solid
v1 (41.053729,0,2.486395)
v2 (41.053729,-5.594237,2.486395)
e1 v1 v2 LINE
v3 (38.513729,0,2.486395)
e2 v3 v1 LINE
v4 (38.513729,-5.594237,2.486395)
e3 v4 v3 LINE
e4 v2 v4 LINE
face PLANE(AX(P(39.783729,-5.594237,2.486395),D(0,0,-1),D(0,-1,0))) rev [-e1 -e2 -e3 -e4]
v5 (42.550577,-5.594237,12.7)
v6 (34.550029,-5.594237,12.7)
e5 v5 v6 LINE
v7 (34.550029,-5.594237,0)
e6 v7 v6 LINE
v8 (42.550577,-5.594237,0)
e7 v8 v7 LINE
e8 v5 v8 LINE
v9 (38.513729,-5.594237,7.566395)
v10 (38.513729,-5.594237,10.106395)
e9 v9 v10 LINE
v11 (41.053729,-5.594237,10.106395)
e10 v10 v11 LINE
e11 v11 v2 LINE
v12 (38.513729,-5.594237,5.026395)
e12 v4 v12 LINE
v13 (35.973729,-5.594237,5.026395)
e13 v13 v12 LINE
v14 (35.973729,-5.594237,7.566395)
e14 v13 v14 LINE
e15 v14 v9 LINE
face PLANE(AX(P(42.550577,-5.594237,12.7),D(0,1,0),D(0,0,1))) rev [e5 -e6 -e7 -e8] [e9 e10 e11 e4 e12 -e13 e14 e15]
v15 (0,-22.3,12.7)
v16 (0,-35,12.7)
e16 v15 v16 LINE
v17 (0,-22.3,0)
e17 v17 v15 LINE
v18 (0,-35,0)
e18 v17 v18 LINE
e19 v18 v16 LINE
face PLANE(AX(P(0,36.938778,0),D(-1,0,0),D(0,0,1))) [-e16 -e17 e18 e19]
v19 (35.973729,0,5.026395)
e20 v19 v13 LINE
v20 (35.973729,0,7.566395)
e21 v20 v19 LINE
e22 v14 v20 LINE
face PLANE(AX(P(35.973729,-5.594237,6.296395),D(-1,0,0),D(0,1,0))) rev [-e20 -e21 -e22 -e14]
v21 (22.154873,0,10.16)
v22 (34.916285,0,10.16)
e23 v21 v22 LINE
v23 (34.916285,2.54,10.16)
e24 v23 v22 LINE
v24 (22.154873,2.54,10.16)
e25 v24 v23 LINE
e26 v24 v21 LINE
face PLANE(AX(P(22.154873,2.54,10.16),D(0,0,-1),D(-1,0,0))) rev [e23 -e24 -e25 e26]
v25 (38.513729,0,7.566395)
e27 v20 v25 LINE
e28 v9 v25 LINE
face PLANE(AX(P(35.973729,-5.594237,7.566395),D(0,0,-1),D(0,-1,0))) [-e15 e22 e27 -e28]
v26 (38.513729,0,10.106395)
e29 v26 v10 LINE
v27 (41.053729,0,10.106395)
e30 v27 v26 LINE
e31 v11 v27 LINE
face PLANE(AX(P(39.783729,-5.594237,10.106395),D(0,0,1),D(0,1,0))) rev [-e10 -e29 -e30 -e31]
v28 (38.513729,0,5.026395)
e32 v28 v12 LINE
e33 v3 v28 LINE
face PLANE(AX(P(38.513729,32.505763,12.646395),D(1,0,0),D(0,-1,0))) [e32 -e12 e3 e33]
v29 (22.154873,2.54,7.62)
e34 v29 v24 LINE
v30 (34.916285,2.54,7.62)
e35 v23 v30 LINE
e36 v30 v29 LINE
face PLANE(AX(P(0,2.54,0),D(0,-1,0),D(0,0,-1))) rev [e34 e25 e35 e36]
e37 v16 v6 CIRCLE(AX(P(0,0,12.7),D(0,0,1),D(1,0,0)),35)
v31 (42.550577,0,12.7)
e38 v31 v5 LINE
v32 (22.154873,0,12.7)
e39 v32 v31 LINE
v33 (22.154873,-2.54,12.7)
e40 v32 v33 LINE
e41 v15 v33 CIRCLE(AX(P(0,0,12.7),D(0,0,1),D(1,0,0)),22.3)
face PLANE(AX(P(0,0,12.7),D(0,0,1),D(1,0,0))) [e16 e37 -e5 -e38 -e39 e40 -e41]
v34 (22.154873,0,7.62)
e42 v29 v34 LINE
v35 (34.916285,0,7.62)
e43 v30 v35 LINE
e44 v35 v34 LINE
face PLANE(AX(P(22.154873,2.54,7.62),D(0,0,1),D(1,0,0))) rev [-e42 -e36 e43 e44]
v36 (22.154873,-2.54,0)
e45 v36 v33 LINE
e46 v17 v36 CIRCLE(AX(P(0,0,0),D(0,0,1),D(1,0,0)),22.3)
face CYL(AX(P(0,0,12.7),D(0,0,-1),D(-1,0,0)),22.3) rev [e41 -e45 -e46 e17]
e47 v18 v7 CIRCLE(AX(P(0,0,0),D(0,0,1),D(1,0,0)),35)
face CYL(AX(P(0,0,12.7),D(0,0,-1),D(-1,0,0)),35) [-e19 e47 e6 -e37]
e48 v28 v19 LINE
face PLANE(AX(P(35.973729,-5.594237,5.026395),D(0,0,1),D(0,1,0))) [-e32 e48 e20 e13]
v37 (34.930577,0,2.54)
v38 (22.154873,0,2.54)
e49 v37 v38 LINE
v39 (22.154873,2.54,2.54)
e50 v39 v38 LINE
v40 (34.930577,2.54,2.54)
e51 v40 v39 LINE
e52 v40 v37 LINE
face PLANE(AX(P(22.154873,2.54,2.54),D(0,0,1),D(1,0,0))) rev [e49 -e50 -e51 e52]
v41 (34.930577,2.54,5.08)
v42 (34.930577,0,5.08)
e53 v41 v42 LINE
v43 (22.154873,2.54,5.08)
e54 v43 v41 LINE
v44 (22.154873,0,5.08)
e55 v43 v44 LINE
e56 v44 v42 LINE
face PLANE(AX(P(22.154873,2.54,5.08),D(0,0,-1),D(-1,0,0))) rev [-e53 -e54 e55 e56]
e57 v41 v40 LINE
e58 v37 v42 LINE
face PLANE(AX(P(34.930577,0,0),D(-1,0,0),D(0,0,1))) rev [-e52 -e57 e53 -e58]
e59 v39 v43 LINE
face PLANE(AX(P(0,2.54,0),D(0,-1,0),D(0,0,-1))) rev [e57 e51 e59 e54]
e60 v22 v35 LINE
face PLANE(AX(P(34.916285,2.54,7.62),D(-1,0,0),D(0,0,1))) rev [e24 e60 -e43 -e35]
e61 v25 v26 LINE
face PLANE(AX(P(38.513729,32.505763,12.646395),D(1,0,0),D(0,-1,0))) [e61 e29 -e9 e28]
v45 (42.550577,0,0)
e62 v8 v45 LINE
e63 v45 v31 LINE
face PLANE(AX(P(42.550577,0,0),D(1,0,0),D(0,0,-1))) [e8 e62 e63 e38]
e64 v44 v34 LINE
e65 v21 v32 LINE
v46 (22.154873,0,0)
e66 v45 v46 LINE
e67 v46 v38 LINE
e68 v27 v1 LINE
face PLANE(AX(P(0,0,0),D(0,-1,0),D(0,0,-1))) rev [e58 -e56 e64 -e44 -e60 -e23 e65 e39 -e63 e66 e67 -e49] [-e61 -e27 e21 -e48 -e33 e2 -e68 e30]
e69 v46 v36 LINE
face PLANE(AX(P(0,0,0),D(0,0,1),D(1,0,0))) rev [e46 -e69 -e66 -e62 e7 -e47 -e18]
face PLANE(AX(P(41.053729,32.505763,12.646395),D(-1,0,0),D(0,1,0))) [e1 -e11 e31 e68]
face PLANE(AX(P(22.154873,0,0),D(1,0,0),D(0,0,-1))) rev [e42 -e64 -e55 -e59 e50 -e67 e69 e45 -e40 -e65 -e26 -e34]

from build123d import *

# Parameters (mm, degrees)
SKETCH1_R               = 35
SKETCH1_R_2             = 22.3
BOSS_EXTRUDE2_DEPTH     = 12.7
SKETCH4_W               = 2.54
SKETCH4_H               = 76.791301982
SKETCH4_W_2             = 87.412375573
SKETCH4_H_2             = 2.54
CUT_EXTRUDE_THIN4_DEPTH = 12.7
SKETCH7_W               = 12.775704106
SKETCH7_H               = 12.7
BOSS_EXTRUDE3_DEPTH     = 2.54
SKETCH11_W              = 12.775704106
SKETCH11_H              = 2.54
SKETCH11_W_2            = 12.761411891
BOSS_EXTRUDE6_DEPTH     = 2.54
SKETCH12_W              = 12.7
SKETCH12_H              = 5.594236833
BOSS_EXTRUDE7_DEPTH     = 7.62
SKETCH12_2_W            = 12.7
SKETCH12_2_H            = 5.594236833
BOSS_EXTRUDE8_DEPTH     = 2.54
CAVITY3_START           = 38.513729061
CAVITY3_OUTLINE_W       = 5.594236833
CAVITY3_OUTLINE_H       = 7.62
CAVITY3_DEPTH           = 2.54
CAVITY3_START_2         = 35.973729061
CAVITY3_2_OUTLINE_W     = 5.594236833
CAVITY3_2_OUTLINE_H     = 2.54
CAVITY3_2_DEPTH         = 2.54


# Read off the part's stored shape, not the designer's step: Cavity3
with BuildPart() as part:
    # Sketch1 → Boss-Extrude2 (new body)
    with BuildSketch(Plane.XY):
        Circle(SKETCH1_R)
        Circle(SKETCH1_R_2, mode=Mode.SUBTRACT)
    extrude(amount=BOSS_EXTRUDE2_DEPTH)

    # Sketch4 → Cut-Extrude-Thin4 (cut)
    with BuildSketch(Plane.XY.offset(12.7)):
        with Locations((-1.27, -1.456872926)):
            Rectangle(SKETCH4_W, SKETCH4_H)
        with Locations((4.088643373, -1.27)):
            Rectangle(SKETCH4_W_2, SKETCH4_H_2)
    extrude(amount=-CUT_EXTRUDE_THIN4_DEPTH, mode=Mode.SUBTRACT)


with BuildPart() as body_2:
    # of the pieces the cut leaves, the one that is kept (cut_extrude_thin4_keep)
    add(part.part.solids().sort_by_distance((34.907712615, -2.54, 12.7))[0])

    # Sketch7 → Boss-Extrude3 (add)
    with BuildSketch(Plane(origin=(0, -2.54, 0), x_dir=(1, 0, 0), z_dir=(0, 1, 0))):
        with Locations((28.542725106, -6.35)):
            Rectangle(SKETCH7_W, SKETCH7_H)
    extrude(amount=BOSS_EXTRUDE3_DEPTH)

    # Sketch11 → Boss-Extrude6 (add)
    with BuildSketch(Plane(origin=(0, 0, 0), x_dir=(1, 0, 0), z_dir=(0, 1, 0))):
        with Locations((28.542725106, -3.81)):
            Rectangle(SKETCH11_W, SKETCH11_H)
        with Locations((28.535578999, -8.89)):
            Rectangle(SKETCH11_W_2, SKETCH11_H)
    extrude(amount=BOSS_EXTRUDE6_DEPTH)

    # Sketch12 → Boss-Extrude7 (add)
    with BuildSketch(Plane(origin=(34.930577159, 0, 0), x_dir=(0, 0, -1), z_dir=(1, 0, 0))):
        with Locations((-6.35, -2.797118417)):
            Rectangle(SKETCH12_W, SKETCH12_H)
    extrude(amount=BOSS_EXTRUDE7_DEPTH)

    # Sketch12<2> → Boss-Extrude8 (add)
    with BuildSketch(Plane(origin=(34.930577159, 0, 0), x_dir=(0, 0, -1), z_dir=(1, 0, 0))):
        with Locations((-6.35, -2.797118417)):
            Rectangle(SKETCH12_2_W, SKETCH12_2_H)
    extrude(amount=-BOSS_EXTRUDE8_DEPTH)

    # Cavity3 outline → Cavity3 (cut)
    with BuildSketch(Plane.YZ.offset(CAVITY3_START)):
        with Locations((-2.797118417, 6.296394857)):
            Rectangle(CAVITY3_OUTLINE_W, CAVITY3_OUTLINE_H)
    extrude(amount=CAVITY3_DEPTH, mode=Mode.SUBTRACT)

    # Cavity3 2 outline → Cavity3 2 (cut)
    with BuildSketch(Plane.YZ.offset(CAVITY3_START_2)):
        with Locations((-2.797118417, 6.296394857)):
            Rectangle(CAVITY3_2_OUTLINE_W, CAVITY3_2_OUTLINE_H)
    extrude(amount=CAVITY3_2_DEPTH, mode=Mode.SUBTRACT)


solid = body_2.part
